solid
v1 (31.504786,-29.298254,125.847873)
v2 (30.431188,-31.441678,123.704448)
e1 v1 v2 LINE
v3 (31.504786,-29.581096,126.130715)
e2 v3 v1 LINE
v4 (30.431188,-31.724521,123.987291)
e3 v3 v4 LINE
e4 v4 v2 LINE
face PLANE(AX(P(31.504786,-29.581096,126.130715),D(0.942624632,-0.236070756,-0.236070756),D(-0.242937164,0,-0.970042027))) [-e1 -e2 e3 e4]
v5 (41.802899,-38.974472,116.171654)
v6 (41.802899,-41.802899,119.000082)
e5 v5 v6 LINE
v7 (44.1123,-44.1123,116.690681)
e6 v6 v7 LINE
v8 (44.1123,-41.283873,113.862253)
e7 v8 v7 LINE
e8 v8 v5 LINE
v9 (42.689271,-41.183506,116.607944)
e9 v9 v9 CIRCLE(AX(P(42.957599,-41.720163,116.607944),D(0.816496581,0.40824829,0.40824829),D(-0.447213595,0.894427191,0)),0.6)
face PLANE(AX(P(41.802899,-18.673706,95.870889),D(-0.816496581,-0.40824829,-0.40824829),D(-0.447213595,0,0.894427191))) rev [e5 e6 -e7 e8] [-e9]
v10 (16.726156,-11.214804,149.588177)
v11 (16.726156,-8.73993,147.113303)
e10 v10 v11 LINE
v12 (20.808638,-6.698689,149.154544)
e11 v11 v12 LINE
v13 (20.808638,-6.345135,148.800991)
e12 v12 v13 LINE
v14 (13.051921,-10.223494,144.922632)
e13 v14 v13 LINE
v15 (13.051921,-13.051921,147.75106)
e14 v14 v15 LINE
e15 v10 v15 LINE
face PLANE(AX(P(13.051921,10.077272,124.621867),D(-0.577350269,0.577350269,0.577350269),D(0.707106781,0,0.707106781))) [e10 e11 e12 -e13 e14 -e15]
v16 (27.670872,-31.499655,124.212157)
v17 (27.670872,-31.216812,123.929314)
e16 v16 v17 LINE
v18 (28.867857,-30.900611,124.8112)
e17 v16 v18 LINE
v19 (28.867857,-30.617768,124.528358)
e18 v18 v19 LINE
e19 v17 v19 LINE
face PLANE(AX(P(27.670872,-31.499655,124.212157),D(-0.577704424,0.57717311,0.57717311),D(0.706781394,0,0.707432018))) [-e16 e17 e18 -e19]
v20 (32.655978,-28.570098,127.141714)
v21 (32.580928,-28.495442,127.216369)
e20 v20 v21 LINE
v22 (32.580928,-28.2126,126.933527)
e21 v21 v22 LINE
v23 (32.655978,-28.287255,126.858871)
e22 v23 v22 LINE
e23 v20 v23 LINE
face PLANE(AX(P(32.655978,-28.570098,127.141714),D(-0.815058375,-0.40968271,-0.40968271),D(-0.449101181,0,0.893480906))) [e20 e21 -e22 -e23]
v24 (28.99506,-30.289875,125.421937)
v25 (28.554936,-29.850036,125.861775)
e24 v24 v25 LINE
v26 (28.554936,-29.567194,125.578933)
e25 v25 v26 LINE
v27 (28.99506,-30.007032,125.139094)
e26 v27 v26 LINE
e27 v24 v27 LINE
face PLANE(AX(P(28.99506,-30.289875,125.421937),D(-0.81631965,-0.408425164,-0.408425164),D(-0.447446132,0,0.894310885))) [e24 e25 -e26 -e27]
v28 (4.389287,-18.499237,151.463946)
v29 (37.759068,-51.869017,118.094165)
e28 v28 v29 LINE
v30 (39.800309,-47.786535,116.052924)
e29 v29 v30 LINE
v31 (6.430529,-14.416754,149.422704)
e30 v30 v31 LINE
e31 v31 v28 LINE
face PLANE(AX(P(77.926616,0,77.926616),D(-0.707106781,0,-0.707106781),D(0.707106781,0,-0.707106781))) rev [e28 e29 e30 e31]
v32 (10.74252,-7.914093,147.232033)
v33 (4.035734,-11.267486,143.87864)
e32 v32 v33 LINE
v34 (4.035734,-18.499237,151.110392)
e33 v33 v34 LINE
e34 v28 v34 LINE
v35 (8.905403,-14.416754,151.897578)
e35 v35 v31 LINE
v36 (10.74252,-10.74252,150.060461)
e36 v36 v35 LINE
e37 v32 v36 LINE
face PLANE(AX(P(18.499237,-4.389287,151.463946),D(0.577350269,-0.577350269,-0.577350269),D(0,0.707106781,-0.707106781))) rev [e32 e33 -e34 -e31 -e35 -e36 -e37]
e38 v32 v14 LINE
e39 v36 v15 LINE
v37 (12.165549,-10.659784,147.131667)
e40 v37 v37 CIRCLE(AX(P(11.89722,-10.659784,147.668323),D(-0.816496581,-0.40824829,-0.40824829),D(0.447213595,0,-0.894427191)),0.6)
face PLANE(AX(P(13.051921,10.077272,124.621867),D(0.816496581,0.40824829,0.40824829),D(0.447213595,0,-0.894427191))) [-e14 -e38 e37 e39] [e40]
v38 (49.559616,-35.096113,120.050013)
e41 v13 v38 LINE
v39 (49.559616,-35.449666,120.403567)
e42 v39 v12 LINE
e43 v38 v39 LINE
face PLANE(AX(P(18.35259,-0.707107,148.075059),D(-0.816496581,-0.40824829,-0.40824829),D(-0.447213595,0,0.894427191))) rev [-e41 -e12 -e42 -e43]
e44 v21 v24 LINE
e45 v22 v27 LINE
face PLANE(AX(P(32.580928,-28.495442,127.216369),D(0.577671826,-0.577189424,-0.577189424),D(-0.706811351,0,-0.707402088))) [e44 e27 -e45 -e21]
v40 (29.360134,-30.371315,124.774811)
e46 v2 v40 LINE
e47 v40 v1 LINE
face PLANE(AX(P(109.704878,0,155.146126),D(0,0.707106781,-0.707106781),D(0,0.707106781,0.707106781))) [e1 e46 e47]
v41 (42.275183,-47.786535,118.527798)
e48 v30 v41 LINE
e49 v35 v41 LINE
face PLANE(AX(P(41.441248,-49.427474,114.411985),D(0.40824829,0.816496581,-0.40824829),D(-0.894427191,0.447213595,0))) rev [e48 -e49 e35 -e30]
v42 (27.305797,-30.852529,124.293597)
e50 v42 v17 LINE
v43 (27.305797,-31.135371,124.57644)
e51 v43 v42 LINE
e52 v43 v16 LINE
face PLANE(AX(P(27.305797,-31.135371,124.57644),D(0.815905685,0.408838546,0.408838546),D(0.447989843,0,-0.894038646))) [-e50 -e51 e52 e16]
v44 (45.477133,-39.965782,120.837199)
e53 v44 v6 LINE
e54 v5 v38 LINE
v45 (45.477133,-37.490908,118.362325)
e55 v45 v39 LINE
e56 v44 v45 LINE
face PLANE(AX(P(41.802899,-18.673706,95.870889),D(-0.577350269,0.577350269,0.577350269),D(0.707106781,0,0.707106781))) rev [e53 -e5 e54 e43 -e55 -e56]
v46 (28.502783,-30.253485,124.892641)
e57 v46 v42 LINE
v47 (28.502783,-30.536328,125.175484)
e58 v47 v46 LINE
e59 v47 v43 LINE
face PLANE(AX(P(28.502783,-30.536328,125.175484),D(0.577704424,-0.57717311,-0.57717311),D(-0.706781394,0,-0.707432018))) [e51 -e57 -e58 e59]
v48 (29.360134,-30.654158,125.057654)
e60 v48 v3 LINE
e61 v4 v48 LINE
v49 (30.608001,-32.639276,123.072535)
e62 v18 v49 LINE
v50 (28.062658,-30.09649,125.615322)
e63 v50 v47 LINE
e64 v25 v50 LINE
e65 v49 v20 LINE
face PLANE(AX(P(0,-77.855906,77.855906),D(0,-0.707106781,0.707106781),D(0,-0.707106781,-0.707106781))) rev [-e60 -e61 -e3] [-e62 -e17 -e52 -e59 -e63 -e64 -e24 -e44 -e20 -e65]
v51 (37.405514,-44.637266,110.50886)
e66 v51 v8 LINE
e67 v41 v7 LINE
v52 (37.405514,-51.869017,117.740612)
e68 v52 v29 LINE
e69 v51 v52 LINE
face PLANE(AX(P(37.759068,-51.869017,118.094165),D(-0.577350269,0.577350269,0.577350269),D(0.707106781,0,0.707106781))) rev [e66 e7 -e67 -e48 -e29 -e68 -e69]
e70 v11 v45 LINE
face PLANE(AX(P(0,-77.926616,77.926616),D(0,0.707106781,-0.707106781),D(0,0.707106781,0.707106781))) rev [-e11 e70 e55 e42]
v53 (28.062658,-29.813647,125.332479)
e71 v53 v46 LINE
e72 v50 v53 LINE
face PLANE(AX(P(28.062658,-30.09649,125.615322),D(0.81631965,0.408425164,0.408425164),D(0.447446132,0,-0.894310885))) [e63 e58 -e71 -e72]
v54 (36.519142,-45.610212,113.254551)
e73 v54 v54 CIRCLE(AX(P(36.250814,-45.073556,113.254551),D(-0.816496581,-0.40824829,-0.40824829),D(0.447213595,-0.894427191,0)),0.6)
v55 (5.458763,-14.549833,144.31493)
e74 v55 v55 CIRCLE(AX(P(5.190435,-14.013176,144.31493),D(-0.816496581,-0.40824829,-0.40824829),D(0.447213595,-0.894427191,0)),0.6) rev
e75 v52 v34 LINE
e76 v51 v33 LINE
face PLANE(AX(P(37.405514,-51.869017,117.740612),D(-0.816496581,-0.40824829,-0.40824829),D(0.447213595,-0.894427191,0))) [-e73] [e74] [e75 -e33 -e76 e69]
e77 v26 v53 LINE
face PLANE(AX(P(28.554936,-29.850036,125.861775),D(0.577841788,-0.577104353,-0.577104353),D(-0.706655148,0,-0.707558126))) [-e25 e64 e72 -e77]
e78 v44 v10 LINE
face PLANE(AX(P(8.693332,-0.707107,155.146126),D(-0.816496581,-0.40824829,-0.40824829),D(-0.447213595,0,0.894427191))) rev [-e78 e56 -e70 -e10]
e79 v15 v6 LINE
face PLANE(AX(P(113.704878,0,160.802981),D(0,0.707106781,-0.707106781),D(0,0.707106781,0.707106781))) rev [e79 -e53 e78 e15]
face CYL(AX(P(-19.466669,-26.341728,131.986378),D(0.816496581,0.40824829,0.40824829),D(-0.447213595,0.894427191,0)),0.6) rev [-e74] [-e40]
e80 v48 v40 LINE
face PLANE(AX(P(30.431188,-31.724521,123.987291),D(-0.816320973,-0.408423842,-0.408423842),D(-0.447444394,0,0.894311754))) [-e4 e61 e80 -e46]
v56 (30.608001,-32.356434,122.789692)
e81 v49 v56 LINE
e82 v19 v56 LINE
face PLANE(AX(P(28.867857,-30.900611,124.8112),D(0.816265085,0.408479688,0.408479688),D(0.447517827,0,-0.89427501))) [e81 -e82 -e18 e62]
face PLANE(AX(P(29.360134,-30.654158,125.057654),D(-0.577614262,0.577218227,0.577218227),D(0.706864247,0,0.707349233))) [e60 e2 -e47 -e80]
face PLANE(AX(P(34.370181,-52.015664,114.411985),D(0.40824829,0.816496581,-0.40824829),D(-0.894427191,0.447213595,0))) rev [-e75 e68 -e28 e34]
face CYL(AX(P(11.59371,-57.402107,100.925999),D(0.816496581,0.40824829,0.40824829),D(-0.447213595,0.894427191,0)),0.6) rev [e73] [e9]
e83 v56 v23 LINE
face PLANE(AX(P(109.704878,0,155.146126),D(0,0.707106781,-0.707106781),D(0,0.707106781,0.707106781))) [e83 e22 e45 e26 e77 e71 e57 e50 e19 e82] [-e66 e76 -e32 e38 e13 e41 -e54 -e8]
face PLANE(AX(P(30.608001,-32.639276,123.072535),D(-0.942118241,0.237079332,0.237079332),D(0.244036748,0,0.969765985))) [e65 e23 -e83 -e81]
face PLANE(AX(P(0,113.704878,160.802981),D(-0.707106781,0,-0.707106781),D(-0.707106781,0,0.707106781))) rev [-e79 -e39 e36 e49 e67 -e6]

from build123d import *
from build123d.topology import SkipClean

# Parameters (mm, degrees)
STOCK_GOUX_START         = -74.233053816
STOCK_GOUX_LIKED_1_DEPTH = 57.798154544
BOSS_EXTRUDE1_DEPTH      = 57.798155
CUT_EXTRUDE1_DEPTH       = 117.763925236
SKETCH6_R                = 0.6
CUT_EXTRUDE2_DEPTH       = 156.868172362
CUT_EXTRUDE4_DEPTH       = 0.4


# Read off the part's stored shape, not the designer's step: Stock-Goux Liked-1
with BuildPart() as part:
    # Stock-Goux Liked-1 outline → Stock-Goux Liked-1 (new body)
    with BuildSketch(Plane(origin=(0, 0, 0), x_dir=(0.8164965809277323, 0.40824829046385713, 0.40824829046385636), z_dir=(0.5773502691896168, -0.5773502691896308, -0.5773502691896297)).offset(STOCK_GOUX_START)):
        Polygon((60.366452966, 115.851992166), (57.866453013, 120.182119103), (57.433440297, 119.932119095), (63.338140771, 109.704877872), (75.147541717, 109.704877872), (75.147541717, 110.204877888), (70.147541811, 110.204877888), (70.147541811, 113.704878), (65.647541921, 113.704878), (63.397541976, 117.601992222), align=None)
    extrude(amount=STOCK_GOUX_LIKED_1_DEPTH)

    # Sketch2 → Boss-Extrude1 (add)
    with SkipClean():  # the faces are left unmerged after this step: merging them gives an invalid solid
        with BuildSketch(Plane(origin=(-42.858473604, 42.858473604, 42.858473604), x_dir=(0.40824829046386124, -0.4082482904638709, 0.8164965809277231), z_dir=(-0.5773502691896168, 0.5773502691896305, 0.5773502691896301))):
            Polygon((132.580982015, -10.227241223), (123.723931305, -5.113620612), (126.676281542, 0), align=None)
        extrude(amount=-BOSS_EXTRUDE1_DEPTH)

    # Sketch5 → Cut-Extrude1 (cut, through all)
    with SkipClean():  # the faces are left unmerged after this step: merging them gives an invalid solid
        with BuildSketch(Plane(origin=(0, -80.401490288, 80.401490288), x_dir=(1, 0, 0), z_dir=(0, -0.7071067811865477, 0.7071067811865475))):
            Polygon((41.80289893, 54.586651387), (44.112300006, 51.320665064), (51.869017359, 56.805492503), (49.559616282, 60.071478827), align=None)
        cut_extrude1 = extrude(amount=-CUT_EXTRUDE1_DEPTH, mode=Mode.SUBTRACT)

    # Sketch6 → Cut-Extrude2 (cut, through all)
    with SkipClean():  # the faces are left unmerged after this step: merging them gives an invalid solid
        with BuildSketch(Plane(origin=(53.600993525, 26.800496763, 26.800496763), x_dir=(0.36514837167011016, 0.18257418583505447, -0.9128709291752772), z_dir=(0.8164965809277269, 0.4082482904638622, 0.40824829046386213))):
            with Locations(Location((-98.379129588, -56.52687032, 0), (0, 0, 90))):
                Circle(SKETCH6_R)
        cut_extrude2 = extrude(amount=-CUT_EXTRUDE2_DEPTH, mode=Mode.SUBTRACT)

    # Sketch8 → Cut-Extrude4 (cut)
    with SkipClean():  # the faces are left unmerged after this step: merging them gives an invalid solid
        with BuildSketch(Plane(origin=(0, -77.573063073, 77.573063073), x_dir=(1, 0, 0), z_dir=(0, 0.7071067811865477, -0.7071067811865475))):
            Polygon((32.655977778, -69.700657922), (32.580927697, -69.806236848), (28.99506031, -67.268526511), (28.554936111, -67.890551752), (28.062658467, -67.542014091), (28.502782665, -66.919988851), (27.305797489, -66.07281337), (27.670871608, -65.557639091), (28.867856784, -66.404814572), (30.608001015, -63.945970422), align=None)
            Polygon((29.360134428, -66.753352233), (31.50478587, -68.270890293), (30.431188114, -65.239630277), align=None, mode=Mode.SUBTRACT)
        extrude(amount=-CUT_EXTRUDE4_DEPTH, mode=Mode.SUBTRACT)

    # Mirror1: Cut-Extrude1, Cut-Extrude2 across plane
    with SkipClean():  # the faces are left unmerged after this step: merging them gives an invalid solid
        add(cut_extrude1.mirror(Plane(origin=(-26.173583561, 26.173583561, 26.173583561), x_dir=(0.40824829046388933, -0.4082482904638845, 0.8164965809277022), z_dir=(0.5773502691896123, -0.5773502691896054, -0.5773502691896596))), mode=Mode.SUBTRACT)
        add(cut_extrude2.mirror(Plane(origin=(-26.173583561, 26.173583561, 26.173583561), x_dir=(0.40824829046388933, -0.4082482904638845, 0.8164965809277022), z_dir=(0.5773502691896123, -0.5773502691896054, -0.5773502691896596))), mode=Mode.SUBTRACT)


solid = part.part
